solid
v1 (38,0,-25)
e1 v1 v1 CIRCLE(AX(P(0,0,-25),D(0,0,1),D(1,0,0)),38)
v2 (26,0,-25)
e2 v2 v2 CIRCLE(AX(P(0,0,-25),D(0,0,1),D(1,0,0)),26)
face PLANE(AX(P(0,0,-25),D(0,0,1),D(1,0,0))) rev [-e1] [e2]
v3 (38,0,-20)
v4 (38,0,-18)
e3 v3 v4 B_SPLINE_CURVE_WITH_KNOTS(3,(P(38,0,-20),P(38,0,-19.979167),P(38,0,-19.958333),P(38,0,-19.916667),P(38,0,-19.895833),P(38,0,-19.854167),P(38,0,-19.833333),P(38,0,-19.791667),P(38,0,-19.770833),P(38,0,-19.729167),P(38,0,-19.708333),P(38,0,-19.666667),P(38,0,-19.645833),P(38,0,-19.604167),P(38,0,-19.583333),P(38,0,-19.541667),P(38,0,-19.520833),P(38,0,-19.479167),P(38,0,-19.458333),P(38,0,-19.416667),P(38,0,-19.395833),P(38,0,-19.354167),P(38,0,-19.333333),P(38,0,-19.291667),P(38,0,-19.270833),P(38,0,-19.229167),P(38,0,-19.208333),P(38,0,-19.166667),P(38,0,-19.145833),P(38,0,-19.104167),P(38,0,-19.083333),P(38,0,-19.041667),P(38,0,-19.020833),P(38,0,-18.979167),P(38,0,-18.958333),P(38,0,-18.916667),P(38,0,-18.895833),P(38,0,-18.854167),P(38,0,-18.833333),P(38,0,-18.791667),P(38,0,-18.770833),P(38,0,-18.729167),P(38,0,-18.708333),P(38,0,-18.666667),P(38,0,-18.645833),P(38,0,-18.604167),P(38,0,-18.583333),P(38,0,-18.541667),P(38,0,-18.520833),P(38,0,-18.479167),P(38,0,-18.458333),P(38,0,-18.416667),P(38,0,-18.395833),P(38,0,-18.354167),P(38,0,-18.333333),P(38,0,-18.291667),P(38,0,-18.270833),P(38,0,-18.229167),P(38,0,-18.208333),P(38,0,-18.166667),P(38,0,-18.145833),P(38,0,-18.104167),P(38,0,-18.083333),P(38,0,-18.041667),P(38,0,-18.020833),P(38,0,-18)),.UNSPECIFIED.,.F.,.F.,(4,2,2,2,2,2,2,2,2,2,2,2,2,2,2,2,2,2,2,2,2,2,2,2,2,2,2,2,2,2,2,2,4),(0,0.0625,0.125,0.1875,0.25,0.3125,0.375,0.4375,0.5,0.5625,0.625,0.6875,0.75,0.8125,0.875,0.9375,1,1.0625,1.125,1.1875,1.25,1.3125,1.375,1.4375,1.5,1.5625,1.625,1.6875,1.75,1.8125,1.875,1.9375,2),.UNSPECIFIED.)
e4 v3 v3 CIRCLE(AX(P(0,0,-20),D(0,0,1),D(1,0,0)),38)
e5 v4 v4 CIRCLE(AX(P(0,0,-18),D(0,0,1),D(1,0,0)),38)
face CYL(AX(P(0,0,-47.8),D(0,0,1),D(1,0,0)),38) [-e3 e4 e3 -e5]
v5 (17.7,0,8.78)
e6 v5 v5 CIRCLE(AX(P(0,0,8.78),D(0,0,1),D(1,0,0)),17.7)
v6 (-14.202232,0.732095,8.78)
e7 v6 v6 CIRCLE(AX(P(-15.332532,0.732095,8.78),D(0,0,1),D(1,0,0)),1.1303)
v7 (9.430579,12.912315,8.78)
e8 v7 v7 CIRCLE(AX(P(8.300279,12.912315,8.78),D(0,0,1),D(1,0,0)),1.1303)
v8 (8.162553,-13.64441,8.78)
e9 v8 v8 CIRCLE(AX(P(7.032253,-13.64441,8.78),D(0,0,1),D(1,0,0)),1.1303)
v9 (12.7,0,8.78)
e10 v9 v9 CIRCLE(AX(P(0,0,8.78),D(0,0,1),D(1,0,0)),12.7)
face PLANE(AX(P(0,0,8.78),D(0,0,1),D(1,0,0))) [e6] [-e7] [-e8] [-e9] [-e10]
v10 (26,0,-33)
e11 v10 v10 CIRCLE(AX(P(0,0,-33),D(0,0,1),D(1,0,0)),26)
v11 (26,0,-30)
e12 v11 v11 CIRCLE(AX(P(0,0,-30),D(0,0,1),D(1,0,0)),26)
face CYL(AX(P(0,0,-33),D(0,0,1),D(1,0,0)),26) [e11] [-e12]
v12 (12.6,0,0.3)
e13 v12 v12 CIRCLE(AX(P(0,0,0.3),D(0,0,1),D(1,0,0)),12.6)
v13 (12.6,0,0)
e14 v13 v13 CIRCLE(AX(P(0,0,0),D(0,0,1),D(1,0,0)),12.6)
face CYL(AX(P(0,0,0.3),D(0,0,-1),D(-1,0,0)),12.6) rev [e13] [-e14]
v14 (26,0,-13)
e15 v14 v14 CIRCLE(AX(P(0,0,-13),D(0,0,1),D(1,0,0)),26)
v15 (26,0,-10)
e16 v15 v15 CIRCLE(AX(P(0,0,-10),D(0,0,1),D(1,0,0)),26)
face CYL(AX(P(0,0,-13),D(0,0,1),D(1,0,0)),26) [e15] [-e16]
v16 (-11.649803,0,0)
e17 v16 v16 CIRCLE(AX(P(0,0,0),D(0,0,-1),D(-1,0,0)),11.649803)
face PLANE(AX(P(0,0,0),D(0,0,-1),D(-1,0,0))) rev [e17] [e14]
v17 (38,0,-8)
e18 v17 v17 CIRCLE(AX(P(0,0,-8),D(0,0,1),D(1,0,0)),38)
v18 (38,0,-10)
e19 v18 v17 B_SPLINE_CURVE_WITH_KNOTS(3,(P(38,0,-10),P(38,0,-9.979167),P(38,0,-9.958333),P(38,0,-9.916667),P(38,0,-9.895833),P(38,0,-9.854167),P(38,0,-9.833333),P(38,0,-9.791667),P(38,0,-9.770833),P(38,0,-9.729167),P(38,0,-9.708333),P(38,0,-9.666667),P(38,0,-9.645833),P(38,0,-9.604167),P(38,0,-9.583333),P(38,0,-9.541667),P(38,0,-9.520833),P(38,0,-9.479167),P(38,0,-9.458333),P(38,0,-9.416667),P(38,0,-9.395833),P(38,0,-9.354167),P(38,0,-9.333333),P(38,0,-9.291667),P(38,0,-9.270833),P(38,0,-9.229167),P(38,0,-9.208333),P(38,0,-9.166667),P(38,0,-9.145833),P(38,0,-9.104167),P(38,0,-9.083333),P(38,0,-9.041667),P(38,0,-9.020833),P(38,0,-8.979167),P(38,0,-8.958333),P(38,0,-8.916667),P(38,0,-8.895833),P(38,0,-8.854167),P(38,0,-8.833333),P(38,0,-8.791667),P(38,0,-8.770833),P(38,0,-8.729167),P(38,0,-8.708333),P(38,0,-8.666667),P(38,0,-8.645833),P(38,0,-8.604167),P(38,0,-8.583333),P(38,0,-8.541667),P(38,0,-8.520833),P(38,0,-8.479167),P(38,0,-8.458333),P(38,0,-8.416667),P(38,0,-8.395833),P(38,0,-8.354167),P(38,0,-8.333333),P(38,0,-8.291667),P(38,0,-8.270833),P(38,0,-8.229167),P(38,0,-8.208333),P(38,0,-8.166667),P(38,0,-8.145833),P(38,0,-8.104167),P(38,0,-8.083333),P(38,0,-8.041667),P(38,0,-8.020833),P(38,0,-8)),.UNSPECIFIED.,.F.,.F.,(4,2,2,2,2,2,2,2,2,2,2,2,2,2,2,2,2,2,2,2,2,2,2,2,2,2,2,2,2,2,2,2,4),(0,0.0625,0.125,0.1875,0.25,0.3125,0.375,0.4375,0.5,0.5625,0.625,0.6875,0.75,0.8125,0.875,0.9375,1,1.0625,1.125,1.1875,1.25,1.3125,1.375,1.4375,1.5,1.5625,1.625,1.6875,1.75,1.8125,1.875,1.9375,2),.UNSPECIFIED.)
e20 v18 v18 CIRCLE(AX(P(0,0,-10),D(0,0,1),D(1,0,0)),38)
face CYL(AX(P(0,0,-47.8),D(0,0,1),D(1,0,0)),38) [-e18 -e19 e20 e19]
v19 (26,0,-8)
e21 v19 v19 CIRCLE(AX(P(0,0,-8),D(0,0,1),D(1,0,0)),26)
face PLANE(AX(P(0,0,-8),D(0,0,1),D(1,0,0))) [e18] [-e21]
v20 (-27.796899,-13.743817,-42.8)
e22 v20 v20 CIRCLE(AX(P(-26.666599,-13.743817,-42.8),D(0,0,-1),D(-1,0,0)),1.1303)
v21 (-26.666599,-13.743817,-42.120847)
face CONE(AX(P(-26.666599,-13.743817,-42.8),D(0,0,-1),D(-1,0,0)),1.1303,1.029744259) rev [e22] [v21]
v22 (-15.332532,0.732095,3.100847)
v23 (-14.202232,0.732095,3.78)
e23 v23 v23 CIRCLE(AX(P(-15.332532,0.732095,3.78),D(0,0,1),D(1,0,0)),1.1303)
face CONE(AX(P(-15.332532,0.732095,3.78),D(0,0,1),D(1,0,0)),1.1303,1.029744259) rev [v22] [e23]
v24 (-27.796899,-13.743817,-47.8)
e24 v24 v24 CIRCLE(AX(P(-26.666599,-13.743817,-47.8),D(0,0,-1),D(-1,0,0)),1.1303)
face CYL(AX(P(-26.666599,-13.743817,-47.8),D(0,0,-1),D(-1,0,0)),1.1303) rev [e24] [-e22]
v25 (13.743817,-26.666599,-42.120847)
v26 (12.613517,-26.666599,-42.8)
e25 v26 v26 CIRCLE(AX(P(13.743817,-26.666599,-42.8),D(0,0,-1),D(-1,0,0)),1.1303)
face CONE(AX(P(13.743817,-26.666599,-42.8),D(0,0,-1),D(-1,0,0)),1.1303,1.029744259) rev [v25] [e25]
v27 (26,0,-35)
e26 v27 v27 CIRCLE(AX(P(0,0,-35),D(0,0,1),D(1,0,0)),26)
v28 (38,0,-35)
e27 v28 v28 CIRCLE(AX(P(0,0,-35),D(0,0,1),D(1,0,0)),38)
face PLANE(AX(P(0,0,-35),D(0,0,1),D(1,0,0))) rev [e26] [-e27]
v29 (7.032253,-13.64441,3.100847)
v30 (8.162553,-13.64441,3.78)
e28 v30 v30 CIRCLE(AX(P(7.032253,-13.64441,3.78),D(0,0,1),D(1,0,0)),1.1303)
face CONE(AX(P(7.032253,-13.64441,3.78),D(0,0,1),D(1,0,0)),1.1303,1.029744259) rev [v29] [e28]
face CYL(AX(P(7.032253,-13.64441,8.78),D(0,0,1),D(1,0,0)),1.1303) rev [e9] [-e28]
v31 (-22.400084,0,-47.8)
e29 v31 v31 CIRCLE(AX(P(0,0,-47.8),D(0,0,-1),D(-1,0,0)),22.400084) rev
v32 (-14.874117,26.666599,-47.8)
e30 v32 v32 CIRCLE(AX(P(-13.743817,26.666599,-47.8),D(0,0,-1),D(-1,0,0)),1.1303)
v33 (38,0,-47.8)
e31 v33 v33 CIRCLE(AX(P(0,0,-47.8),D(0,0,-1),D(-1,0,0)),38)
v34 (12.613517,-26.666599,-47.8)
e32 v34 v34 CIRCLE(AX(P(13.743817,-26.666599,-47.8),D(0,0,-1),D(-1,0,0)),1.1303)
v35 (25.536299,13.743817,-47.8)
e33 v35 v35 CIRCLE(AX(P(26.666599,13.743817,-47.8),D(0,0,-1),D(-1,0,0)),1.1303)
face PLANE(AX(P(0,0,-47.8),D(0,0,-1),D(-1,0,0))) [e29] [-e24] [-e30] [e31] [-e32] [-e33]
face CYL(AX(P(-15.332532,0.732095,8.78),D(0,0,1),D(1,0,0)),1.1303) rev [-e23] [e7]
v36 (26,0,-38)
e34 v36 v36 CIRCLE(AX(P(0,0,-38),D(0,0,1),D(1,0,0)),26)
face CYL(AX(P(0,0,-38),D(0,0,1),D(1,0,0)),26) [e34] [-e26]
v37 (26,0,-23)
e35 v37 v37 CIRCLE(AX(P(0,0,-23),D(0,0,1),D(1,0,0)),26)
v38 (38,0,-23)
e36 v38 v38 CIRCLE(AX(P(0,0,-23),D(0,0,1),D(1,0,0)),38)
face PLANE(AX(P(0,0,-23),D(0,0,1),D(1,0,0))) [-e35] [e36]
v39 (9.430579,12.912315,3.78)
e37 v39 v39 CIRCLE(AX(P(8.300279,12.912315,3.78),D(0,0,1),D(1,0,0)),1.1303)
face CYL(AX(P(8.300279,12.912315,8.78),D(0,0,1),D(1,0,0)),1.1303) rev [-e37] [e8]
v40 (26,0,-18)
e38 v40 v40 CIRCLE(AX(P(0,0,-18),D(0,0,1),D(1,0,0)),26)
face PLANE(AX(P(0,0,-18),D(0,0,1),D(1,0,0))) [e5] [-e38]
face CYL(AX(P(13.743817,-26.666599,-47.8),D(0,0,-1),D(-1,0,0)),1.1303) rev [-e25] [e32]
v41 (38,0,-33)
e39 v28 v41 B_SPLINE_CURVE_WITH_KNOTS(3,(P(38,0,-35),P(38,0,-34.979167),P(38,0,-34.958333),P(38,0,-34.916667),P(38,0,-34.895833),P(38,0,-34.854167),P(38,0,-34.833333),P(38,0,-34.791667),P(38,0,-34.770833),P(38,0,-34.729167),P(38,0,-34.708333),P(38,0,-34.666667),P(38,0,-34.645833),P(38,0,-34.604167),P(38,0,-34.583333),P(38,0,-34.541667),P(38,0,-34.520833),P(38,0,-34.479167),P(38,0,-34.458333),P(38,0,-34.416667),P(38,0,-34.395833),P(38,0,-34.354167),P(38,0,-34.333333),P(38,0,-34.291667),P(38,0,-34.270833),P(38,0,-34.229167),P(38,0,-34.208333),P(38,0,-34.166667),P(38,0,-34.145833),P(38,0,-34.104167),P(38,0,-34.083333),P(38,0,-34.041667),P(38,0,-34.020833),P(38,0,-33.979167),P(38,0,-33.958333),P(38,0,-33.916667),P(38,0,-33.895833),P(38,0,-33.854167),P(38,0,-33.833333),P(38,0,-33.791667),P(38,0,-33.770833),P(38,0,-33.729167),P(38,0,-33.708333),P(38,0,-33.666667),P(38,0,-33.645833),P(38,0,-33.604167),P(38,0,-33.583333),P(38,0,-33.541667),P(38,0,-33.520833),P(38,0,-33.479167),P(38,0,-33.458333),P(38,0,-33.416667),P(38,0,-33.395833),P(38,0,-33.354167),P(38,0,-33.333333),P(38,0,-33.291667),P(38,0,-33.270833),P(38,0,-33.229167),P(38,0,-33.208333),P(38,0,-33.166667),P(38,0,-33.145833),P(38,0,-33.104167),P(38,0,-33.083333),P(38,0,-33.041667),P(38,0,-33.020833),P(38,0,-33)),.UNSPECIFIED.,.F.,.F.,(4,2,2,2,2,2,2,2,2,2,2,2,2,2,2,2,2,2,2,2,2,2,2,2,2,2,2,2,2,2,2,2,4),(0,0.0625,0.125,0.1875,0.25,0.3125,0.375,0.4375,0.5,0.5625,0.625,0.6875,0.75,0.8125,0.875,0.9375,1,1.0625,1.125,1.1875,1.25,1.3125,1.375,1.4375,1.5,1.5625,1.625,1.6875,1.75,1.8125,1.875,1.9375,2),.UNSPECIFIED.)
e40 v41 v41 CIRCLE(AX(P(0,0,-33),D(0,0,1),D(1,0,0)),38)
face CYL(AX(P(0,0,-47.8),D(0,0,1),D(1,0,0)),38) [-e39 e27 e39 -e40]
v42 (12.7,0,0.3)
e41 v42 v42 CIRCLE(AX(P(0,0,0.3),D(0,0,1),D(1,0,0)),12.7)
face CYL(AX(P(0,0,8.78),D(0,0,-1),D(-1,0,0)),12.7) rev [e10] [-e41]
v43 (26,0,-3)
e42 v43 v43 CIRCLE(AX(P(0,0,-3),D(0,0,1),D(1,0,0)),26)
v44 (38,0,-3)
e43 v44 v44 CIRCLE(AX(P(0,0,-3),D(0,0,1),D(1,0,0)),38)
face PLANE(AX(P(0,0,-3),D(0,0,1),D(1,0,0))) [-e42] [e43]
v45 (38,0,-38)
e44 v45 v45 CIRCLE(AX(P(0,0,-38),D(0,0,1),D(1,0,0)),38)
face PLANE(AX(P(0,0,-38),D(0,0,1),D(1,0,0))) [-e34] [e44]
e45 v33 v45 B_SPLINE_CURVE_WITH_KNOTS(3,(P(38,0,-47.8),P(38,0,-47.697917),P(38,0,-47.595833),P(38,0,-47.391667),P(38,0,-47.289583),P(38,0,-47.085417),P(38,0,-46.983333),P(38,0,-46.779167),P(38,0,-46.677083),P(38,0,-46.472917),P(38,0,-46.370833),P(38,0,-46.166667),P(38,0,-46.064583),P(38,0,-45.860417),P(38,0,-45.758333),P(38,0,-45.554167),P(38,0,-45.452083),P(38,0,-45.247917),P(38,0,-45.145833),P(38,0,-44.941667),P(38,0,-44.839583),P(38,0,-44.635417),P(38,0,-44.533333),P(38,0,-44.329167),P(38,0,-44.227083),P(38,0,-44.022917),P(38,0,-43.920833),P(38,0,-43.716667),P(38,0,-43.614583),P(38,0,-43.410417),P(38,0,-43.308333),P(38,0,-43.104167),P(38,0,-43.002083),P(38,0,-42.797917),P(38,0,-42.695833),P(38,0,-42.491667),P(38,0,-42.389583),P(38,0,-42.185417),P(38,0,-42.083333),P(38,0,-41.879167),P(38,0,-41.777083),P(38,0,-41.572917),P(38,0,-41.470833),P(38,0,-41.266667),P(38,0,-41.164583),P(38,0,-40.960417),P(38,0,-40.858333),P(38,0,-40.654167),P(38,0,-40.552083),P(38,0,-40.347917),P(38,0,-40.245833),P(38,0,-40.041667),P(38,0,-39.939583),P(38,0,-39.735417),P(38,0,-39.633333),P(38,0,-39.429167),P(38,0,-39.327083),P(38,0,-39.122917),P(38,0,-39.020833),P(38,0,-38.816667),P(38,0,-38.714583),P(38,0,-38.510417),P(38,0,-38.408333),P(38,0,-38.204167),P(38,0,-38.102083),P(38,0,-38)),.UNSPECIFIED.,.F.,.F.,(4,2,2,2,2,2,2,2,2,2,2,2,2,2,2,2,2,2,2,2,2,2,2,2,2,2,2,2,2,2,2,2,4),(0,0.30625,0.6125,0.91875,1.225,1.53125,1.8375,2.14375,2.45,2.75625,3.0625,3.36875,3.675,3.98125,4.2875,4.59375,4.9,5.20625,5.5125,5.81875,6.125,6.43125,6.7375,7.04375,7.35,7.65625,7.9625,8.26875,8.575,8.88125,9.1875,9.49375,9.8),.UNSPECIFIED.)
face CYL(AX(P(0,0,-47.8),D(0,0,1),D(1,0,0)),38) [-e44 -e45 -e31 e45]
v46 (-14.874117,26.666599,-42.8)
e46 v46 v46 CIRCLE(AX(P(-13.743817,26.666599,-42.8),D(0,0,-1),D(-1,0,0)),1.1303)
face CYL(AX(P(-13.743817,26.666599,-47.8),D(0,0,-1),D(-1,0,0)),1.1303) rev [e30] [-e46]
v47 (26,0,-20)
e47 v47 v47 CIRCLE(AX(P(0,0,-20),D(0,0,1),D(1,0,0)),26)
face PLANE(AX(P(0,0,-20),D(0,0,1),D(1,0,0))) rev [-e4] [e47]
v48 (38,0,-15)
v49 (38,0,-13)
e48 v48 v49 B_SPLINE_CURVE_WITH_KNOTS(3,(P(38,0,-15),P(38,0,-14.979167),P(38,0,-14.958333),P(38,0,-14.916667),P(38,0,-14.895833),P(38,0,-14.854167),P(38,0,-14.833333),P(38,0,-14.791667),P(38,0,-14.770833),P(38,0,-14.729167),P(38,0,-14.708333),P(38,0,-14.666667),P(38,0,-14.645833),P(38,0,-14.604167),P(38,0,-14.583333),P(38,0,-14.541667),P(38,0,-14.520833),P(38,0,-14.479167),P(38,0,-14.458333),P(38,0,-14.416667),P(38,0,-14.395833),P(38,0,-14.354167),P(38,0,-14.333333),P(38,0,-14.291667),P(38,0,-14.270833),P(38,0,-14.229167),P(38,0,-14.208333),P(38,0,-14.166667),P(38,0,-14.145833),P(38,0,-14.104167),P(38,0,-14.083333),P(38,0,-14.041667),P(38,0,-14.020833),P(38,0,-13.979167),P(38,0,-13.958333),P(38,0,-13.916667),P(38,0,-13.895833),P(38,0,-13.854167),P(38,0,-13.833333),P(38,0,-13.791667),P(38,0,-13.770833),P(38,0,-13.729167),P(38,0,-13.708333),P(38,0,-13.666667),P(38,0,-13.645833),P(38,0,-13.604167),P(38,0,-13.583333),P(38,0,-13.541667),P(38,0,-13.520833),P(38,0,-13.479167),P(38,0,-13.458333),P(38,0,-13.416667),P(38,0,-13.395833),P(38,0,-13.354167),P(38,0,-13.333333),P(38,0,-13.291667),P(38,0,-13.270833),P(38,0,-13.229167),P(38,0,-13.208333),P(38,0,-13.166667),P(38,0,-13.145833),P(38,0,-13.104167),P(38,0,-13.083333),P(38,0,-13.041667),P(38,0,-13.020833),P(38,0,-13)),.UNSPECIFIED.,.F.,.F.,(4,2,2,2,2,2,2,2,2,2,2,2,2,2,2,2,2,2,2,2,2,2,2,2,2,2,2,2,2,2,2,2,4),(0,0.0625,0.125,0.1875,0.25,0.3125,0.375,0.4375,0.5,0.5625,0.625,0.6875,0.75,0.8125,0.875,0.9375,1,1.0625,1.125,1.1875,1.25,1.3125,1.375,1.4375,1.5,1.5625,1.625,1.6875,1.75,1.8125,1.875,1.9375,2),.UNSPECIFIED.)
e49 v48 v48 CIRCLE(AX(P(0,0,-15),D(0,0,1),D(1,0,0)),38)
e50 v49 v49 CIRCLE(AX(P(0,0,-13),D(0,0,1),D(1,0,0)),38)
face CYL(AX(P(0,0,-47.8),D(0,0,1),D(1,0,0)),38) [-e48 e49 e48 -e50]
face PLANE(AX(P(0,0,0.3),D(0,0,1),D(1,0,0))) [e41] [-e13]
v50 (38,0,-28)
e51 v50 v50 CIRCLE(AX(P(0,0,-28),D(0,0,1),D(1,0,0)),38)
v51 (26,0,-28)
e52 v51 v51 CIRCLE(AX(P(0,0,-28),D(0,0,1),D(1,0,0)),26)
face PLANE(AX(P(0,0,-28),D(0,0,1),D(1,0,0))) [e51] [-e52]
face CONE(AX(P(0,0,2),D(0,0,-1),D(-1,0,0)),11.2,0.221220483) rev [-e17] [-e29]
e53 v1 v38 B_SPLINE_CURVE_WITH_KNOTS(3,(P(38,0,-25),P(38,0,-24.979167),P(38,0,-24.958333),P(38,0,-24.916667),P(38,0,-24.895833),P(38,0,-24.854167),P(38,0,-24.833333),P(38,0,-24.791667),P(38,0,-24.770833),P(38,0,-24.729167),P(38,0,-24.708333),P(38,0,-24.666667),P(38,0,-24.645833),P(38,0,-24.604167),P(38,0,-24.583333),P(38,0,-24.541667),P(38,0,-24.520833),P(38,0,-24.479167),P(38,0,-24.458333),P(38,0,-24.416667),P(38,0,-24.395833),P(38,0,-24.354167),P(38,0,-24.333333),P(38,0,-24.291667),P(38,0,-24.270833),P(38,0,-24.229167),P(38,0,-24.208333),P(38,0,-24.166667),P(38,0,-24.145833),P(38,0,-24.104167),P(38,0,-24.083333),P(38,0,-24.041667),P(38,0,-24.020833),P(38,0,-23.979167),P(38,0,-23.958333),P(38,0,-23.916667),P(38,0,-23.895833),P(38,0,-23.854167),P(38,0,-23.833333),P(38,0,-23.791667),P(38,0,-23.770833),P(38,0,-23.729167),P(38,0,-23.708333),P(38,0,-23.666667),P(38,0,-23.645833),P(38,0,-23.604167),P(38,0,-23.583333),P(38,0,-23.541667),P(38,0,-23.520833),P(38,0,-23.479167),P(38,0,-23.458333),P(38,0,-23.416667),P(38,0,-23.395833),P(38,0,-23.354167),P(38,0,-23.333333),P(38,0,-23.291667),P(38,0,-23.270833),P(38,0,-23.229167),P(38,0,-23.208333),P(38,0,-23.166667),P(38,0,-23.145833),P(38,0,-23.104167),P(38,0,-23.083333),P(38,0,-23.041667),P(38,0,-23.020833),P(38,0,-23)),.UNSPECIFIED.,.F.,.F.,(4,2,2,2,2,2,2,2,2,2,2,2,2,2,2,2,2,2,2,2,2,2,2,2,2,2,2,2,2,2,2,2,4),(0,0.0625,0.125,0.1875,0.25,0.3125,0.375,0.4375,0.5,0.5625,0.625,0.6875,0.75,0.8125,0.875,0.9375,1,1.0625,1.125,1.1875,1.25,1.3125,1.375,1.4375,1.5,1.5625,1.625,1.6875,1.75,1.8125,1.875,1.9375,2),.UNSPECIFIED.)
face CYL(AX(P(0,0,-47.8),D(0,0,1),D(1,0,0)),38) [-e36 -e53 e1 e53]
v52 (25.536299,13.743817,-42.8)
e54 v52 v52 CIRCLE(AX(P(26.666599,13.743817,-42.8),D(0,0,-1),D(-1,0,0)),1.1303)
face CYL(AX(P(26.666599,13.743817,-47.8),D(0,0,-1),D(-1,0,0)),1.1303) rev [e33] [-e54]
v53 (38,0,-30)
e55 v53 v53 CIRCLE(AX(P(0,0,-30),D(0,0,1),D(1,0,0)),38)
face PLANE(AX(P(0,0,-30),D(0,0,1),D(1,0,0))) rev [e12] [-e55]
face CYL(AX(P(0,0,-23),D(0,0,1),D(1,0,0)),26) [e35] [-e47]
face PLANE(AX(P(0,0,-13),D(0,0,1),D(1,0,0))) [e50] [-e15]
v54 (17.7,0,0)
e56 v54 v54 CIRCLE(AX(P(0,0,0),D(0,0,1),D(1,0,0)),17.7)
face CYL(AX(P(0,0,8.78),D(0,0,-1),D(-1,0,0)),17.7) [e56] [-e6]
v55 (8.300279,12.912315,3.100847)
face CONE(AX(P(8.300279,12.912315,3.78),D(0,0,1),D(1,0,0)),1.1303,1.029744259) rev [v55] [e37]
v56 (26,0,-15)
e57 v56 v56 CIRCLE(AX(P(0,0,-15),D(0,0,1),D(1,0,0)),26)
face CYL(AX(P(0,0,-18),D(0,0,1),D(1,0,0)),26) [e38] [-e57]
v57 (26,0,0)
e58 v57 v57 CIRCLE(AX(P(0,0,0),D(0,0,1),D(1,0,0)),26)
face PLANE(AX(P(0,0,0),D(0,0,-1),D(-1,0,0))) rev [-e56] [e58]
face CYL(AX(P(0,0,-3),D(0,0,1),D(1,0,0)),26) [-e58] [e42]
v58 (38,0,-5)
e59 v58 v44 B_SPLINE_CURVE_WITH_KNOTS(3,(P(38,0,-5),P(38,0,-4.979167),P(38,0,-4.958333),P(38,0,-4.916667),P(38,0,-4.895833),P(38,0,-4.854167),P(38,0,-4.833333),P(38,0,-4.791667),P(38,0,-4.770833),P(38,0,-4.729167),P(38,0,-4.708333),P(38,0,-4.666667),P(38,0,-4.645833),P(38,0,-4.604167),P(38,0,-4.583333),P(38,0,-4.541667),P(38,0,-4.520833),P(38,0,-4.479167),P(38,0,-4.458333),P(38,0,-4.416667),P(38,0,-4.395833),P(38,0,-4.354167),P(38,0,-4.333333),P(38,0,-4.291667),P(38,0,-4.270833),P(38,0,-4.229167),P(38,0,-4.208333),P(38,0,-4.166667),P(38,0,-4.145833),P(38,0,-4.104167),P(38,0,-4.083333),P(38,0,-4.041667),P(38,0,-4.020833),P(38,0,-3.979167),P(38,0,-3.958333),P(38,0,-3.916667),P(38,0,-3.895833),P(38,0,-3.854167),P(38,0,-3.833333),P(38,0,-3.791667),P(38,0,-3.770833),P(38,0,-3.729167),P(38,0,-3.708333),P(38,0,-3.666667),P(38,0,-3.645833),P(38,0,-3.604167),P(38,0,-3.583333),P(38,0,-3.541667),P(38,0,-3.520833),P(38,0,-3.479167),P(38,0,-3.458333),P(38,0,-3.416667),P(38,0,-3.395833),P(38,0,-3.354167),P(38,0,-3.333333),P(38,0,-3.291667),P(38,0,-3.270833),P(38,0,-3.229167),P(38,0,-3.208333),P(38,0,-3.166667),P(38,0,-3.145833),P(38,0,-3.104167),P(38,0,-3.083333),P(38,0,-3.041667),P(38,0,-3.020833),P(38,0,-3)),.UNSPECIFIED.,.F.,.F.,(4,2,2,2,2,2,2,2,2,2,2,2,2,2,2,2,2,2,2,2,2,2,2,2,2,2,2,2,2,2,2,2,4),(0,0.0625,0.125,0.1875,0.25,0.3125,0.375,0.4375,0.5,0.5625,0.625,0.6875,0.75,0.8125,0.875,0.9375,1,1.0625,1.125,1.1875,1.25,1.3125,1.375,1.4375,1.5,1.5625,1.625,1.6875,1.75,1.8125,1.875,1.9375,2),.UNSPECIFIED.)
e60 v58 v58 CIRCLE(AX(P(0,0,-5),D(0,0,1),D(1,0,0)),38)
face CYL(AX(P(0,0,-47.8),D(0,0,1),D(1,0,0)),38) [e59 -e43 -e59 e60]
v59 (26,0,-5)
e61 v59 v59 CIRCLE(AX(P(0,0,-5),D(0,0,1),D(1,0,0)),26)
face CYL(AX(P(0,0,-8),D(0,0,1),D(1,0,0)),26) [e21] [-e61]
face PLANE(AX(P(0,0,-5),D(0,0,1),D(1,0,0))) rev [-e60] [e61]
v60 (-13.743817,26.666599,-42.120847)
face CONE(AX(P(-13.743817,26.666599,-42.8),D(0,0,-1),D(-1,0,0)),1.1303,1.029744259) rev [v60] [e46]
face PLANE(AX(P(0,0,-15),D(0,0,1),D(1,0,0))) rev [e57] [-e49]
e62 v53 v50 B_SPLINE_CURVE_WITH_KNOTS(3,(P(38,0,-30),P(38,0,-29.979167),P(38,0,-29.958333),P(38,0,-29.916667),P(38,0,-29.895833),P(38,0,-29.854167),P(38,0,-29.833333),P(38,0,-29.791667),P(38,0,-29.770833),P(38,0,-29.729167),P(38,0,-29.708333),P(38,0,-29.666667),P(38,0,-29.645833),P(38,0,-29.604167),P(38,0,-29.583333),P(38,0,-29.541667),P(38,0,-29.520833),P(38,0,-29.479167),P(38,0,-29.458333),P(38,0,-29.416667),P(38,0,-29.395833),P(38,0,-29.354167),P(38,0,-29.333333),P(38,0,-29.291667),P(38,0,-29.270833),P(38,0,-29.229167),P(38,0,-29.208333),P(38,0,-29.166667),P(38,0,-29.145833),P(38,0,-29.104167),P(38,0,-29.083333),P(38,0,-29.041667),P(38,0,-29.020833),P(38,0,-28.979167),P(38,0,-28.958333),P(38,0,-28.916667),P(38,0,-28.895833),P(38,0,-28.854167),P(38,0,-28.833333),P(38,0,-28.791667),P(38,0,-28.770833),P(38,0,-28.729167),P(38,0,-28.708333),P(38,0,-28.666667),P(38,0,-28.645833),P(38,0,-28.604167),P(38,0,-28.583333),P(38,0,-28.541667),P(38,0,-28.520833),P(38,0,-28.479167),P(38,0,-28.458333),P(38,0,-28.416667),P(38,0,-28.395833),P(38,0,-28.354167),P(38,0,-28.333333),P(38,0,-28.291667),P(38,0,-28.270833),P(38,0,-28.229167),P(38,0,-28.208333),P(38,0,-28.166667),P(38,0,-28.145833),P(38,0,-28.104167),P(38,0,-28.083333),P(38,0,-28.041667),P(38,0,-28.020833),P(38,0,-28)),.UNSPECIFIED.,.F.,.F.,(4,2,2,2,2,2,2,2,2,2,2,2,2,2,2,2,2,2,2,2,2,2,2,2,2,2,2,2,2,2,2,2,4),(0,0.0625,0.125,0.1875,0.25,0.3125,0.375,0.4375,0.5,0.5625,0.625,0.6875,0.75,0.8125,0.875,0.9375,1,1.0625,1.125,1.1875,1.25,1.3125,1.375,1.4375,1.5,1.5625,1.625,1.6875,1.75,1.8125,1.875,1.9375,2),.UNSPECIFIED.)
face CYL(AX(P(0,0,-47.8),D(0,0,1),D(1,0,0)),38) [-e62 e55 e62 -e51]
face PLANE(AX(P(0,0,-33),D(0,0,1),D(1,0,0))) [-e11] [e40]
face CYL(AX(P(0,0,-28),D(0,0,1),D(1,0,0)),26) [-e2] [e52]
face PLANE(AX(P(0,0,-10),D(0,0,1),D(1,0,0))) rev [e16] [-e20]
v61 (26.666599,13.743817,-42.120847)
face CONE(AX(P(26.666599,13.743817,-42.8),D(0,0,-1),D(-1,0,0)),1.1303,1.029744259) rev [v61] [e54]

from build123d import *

# Parameters (mm, degrees)
ESQUISSE1_R         = 17.7
ESQUISSE1_R_2       = 12.7
BOSS_EXTRU_1_DEPTH  = 8.78
ESQUISSE2_R         = 38
ESQUISSE2_R_2       = 11.2
BOSS_EXTRU_2_DEPTH  = 47.8
CHANFREIN3_SIZE     = 11.200084029
CHANFREIN3_SIZE_2   = 49.8
SKETCH7_R           = 38
SKETCH7_R_2         = 26
CUT_EXTRUDE2_DEPTH  = 3
CIRPATTERN1_COUNT   = 4
CIRPATTERN2_COUNT   = 3
SKETCH23_R          = 13.7
SKETCH23_R_2        = 12.6
BOSS_EXTRUDE1_DEPTH = 0.3
LPATTERN1_COUNT     = 8
LPATTERN1_PITCH     = 5


with BuildPart() as part:
    # Esquisse1 → Boss.-Extru.1 (new body)
    with BuildSketch(Plane.XY):
        Circle(ESQUISSE1_R)
        Circle(ESQUISSE1_R_2, mode=Mode.SUBTRACT)
    extrude(amount=BOSS_EXTRU_1_DEPTH)

    # Esquisse2 → Boss.-Extru.2 (add)
    with BuildSketch(Plane(origin=(0, 0, 0), x_dir=(-1, 0, 0), z_dir=(0, 0, -1))):
        with Locations(Location((0, 0, 0), (0, 0, 180))):
            Circle(ESQUISSE2_R)
        with Locations(Location((0, 0, 0), (0, 0, 180))):
            Circle(ESQUISSE2_R_2, mode=Mode.SUBTRACT)
    extrude(amount=BOSS_EXTRU_2_DEPTH)

    # Chanfrein3
    # the kernel refuses this chamfer: 49.8, 11.200084029 mm, written as the material it takes off along each edge
    with BuildSketch(Plane(origin=(0, 0, -47.8), x_dir=(1, 0, 0), z_dir=(0, 1, 0))) as chanfrein3_piece_1:
        Polygon((11.2 + CHANFREIN3_SIZE, 0), (11.2, -CHANFREIN3_SIZE_2), (11.2, 0), align=None)
    revolve(axis=Axis((0, 0, -47.8), (0, 0, -1)), mode=Mode.SUBTRACT)

    # Sketch7 → Cut-Extrude2 (cut)
    with BuildSketch(Plane.XY):
        Circle(SKETCH7_R)
        Circle(SKETCH7_R_2, mode=Mode.SUBTRACT)
    cut_extrude2 = extrude(amount=-CUT_EXTRUDE2_DEPTH, mode=Mode.SUBTRACT)

    # Sketch19 → #4-40 Tapped Hole1 (revolve, cut)
    with BuildSketch(Plane(origin=(13.743816873, -26.666598917, -47.8), x_dir=(0, 1, 0), z_dir=(1, 0, 0))):
        Polygon((0, 0), (0, 5.679152758), (1.1303, 5), (1.1303, 0), align=None)
    f_4_40_tapped_hole1 = revolve(axis=Axis((13.743816873, -26.666598917, -54.15), (0, 0, 1)), mode=Mode.SUBTRACT)

    # CirPattern1: #4-40 Tapped Hole1 ×4 about axis
    cirpattern1_axis = Axis((0, 0, 0), (0, 0, 1))
    for i in range(1, CIRPATTERN1_COUNT):
        add(f_4_40_tapped_hole1.rotate(cirpattern1_axis, i * 360 / CIRPATTERN1_COUNT), mode=Mode.SUBTRACT)

    # Sketch22 → #4-40 Tapped Hole2 (revolve, cut)
    with BuildSketch(Plane(origin=(7.032252966, -13.644409779, 8.78), x_dir=(0, -1, 0), z_dir=(1, 0, 0))):
        Polygon((0, 0), (0, 5.679152758), (1.1303, 5), (1.1303, 0), align=None)
    f_4_40_tapped_hole2 = revolve(axis=Axis((7.032252966, -13.644409779, 15.13), (0, 0, -1)), mode=Mode.SUBTRACT)

    # CirPattern2: #4-40 Tapped Hole2 ×3 about axis
    cirpattern2_axis = Axis((0, 0, 0), (0, 0, 1))
    for i in range(1, CIRPATTERN2_COUNT):
        add(f_4_40_tapped_hole2.rotate(cirpattern2_axis, i * 360 / CIRPATTERN2_COUNT), mode=Mode.SUBTRACT)

    # Sketch23 → Boss-Extrude1 (add)
    with BuildSketch(Plane.XY):
        Circle(SKETCH23_R)
        Circle(SKETCH23_R_2, mode=Mode.SUBTRACT)
    extrude(amount=BOSS_EXTRUDE1_DEPTH)

    # LPattern1: Cut-Extrude2 ×8
    with Locations(*[(0, 0, -i * LPATTERN1_PITCH) for i in range(1, LPATTERN1_COUNT)]):
        add(cut_extrude2, mode=Mode.SUBTRACT)


solid = part.part
